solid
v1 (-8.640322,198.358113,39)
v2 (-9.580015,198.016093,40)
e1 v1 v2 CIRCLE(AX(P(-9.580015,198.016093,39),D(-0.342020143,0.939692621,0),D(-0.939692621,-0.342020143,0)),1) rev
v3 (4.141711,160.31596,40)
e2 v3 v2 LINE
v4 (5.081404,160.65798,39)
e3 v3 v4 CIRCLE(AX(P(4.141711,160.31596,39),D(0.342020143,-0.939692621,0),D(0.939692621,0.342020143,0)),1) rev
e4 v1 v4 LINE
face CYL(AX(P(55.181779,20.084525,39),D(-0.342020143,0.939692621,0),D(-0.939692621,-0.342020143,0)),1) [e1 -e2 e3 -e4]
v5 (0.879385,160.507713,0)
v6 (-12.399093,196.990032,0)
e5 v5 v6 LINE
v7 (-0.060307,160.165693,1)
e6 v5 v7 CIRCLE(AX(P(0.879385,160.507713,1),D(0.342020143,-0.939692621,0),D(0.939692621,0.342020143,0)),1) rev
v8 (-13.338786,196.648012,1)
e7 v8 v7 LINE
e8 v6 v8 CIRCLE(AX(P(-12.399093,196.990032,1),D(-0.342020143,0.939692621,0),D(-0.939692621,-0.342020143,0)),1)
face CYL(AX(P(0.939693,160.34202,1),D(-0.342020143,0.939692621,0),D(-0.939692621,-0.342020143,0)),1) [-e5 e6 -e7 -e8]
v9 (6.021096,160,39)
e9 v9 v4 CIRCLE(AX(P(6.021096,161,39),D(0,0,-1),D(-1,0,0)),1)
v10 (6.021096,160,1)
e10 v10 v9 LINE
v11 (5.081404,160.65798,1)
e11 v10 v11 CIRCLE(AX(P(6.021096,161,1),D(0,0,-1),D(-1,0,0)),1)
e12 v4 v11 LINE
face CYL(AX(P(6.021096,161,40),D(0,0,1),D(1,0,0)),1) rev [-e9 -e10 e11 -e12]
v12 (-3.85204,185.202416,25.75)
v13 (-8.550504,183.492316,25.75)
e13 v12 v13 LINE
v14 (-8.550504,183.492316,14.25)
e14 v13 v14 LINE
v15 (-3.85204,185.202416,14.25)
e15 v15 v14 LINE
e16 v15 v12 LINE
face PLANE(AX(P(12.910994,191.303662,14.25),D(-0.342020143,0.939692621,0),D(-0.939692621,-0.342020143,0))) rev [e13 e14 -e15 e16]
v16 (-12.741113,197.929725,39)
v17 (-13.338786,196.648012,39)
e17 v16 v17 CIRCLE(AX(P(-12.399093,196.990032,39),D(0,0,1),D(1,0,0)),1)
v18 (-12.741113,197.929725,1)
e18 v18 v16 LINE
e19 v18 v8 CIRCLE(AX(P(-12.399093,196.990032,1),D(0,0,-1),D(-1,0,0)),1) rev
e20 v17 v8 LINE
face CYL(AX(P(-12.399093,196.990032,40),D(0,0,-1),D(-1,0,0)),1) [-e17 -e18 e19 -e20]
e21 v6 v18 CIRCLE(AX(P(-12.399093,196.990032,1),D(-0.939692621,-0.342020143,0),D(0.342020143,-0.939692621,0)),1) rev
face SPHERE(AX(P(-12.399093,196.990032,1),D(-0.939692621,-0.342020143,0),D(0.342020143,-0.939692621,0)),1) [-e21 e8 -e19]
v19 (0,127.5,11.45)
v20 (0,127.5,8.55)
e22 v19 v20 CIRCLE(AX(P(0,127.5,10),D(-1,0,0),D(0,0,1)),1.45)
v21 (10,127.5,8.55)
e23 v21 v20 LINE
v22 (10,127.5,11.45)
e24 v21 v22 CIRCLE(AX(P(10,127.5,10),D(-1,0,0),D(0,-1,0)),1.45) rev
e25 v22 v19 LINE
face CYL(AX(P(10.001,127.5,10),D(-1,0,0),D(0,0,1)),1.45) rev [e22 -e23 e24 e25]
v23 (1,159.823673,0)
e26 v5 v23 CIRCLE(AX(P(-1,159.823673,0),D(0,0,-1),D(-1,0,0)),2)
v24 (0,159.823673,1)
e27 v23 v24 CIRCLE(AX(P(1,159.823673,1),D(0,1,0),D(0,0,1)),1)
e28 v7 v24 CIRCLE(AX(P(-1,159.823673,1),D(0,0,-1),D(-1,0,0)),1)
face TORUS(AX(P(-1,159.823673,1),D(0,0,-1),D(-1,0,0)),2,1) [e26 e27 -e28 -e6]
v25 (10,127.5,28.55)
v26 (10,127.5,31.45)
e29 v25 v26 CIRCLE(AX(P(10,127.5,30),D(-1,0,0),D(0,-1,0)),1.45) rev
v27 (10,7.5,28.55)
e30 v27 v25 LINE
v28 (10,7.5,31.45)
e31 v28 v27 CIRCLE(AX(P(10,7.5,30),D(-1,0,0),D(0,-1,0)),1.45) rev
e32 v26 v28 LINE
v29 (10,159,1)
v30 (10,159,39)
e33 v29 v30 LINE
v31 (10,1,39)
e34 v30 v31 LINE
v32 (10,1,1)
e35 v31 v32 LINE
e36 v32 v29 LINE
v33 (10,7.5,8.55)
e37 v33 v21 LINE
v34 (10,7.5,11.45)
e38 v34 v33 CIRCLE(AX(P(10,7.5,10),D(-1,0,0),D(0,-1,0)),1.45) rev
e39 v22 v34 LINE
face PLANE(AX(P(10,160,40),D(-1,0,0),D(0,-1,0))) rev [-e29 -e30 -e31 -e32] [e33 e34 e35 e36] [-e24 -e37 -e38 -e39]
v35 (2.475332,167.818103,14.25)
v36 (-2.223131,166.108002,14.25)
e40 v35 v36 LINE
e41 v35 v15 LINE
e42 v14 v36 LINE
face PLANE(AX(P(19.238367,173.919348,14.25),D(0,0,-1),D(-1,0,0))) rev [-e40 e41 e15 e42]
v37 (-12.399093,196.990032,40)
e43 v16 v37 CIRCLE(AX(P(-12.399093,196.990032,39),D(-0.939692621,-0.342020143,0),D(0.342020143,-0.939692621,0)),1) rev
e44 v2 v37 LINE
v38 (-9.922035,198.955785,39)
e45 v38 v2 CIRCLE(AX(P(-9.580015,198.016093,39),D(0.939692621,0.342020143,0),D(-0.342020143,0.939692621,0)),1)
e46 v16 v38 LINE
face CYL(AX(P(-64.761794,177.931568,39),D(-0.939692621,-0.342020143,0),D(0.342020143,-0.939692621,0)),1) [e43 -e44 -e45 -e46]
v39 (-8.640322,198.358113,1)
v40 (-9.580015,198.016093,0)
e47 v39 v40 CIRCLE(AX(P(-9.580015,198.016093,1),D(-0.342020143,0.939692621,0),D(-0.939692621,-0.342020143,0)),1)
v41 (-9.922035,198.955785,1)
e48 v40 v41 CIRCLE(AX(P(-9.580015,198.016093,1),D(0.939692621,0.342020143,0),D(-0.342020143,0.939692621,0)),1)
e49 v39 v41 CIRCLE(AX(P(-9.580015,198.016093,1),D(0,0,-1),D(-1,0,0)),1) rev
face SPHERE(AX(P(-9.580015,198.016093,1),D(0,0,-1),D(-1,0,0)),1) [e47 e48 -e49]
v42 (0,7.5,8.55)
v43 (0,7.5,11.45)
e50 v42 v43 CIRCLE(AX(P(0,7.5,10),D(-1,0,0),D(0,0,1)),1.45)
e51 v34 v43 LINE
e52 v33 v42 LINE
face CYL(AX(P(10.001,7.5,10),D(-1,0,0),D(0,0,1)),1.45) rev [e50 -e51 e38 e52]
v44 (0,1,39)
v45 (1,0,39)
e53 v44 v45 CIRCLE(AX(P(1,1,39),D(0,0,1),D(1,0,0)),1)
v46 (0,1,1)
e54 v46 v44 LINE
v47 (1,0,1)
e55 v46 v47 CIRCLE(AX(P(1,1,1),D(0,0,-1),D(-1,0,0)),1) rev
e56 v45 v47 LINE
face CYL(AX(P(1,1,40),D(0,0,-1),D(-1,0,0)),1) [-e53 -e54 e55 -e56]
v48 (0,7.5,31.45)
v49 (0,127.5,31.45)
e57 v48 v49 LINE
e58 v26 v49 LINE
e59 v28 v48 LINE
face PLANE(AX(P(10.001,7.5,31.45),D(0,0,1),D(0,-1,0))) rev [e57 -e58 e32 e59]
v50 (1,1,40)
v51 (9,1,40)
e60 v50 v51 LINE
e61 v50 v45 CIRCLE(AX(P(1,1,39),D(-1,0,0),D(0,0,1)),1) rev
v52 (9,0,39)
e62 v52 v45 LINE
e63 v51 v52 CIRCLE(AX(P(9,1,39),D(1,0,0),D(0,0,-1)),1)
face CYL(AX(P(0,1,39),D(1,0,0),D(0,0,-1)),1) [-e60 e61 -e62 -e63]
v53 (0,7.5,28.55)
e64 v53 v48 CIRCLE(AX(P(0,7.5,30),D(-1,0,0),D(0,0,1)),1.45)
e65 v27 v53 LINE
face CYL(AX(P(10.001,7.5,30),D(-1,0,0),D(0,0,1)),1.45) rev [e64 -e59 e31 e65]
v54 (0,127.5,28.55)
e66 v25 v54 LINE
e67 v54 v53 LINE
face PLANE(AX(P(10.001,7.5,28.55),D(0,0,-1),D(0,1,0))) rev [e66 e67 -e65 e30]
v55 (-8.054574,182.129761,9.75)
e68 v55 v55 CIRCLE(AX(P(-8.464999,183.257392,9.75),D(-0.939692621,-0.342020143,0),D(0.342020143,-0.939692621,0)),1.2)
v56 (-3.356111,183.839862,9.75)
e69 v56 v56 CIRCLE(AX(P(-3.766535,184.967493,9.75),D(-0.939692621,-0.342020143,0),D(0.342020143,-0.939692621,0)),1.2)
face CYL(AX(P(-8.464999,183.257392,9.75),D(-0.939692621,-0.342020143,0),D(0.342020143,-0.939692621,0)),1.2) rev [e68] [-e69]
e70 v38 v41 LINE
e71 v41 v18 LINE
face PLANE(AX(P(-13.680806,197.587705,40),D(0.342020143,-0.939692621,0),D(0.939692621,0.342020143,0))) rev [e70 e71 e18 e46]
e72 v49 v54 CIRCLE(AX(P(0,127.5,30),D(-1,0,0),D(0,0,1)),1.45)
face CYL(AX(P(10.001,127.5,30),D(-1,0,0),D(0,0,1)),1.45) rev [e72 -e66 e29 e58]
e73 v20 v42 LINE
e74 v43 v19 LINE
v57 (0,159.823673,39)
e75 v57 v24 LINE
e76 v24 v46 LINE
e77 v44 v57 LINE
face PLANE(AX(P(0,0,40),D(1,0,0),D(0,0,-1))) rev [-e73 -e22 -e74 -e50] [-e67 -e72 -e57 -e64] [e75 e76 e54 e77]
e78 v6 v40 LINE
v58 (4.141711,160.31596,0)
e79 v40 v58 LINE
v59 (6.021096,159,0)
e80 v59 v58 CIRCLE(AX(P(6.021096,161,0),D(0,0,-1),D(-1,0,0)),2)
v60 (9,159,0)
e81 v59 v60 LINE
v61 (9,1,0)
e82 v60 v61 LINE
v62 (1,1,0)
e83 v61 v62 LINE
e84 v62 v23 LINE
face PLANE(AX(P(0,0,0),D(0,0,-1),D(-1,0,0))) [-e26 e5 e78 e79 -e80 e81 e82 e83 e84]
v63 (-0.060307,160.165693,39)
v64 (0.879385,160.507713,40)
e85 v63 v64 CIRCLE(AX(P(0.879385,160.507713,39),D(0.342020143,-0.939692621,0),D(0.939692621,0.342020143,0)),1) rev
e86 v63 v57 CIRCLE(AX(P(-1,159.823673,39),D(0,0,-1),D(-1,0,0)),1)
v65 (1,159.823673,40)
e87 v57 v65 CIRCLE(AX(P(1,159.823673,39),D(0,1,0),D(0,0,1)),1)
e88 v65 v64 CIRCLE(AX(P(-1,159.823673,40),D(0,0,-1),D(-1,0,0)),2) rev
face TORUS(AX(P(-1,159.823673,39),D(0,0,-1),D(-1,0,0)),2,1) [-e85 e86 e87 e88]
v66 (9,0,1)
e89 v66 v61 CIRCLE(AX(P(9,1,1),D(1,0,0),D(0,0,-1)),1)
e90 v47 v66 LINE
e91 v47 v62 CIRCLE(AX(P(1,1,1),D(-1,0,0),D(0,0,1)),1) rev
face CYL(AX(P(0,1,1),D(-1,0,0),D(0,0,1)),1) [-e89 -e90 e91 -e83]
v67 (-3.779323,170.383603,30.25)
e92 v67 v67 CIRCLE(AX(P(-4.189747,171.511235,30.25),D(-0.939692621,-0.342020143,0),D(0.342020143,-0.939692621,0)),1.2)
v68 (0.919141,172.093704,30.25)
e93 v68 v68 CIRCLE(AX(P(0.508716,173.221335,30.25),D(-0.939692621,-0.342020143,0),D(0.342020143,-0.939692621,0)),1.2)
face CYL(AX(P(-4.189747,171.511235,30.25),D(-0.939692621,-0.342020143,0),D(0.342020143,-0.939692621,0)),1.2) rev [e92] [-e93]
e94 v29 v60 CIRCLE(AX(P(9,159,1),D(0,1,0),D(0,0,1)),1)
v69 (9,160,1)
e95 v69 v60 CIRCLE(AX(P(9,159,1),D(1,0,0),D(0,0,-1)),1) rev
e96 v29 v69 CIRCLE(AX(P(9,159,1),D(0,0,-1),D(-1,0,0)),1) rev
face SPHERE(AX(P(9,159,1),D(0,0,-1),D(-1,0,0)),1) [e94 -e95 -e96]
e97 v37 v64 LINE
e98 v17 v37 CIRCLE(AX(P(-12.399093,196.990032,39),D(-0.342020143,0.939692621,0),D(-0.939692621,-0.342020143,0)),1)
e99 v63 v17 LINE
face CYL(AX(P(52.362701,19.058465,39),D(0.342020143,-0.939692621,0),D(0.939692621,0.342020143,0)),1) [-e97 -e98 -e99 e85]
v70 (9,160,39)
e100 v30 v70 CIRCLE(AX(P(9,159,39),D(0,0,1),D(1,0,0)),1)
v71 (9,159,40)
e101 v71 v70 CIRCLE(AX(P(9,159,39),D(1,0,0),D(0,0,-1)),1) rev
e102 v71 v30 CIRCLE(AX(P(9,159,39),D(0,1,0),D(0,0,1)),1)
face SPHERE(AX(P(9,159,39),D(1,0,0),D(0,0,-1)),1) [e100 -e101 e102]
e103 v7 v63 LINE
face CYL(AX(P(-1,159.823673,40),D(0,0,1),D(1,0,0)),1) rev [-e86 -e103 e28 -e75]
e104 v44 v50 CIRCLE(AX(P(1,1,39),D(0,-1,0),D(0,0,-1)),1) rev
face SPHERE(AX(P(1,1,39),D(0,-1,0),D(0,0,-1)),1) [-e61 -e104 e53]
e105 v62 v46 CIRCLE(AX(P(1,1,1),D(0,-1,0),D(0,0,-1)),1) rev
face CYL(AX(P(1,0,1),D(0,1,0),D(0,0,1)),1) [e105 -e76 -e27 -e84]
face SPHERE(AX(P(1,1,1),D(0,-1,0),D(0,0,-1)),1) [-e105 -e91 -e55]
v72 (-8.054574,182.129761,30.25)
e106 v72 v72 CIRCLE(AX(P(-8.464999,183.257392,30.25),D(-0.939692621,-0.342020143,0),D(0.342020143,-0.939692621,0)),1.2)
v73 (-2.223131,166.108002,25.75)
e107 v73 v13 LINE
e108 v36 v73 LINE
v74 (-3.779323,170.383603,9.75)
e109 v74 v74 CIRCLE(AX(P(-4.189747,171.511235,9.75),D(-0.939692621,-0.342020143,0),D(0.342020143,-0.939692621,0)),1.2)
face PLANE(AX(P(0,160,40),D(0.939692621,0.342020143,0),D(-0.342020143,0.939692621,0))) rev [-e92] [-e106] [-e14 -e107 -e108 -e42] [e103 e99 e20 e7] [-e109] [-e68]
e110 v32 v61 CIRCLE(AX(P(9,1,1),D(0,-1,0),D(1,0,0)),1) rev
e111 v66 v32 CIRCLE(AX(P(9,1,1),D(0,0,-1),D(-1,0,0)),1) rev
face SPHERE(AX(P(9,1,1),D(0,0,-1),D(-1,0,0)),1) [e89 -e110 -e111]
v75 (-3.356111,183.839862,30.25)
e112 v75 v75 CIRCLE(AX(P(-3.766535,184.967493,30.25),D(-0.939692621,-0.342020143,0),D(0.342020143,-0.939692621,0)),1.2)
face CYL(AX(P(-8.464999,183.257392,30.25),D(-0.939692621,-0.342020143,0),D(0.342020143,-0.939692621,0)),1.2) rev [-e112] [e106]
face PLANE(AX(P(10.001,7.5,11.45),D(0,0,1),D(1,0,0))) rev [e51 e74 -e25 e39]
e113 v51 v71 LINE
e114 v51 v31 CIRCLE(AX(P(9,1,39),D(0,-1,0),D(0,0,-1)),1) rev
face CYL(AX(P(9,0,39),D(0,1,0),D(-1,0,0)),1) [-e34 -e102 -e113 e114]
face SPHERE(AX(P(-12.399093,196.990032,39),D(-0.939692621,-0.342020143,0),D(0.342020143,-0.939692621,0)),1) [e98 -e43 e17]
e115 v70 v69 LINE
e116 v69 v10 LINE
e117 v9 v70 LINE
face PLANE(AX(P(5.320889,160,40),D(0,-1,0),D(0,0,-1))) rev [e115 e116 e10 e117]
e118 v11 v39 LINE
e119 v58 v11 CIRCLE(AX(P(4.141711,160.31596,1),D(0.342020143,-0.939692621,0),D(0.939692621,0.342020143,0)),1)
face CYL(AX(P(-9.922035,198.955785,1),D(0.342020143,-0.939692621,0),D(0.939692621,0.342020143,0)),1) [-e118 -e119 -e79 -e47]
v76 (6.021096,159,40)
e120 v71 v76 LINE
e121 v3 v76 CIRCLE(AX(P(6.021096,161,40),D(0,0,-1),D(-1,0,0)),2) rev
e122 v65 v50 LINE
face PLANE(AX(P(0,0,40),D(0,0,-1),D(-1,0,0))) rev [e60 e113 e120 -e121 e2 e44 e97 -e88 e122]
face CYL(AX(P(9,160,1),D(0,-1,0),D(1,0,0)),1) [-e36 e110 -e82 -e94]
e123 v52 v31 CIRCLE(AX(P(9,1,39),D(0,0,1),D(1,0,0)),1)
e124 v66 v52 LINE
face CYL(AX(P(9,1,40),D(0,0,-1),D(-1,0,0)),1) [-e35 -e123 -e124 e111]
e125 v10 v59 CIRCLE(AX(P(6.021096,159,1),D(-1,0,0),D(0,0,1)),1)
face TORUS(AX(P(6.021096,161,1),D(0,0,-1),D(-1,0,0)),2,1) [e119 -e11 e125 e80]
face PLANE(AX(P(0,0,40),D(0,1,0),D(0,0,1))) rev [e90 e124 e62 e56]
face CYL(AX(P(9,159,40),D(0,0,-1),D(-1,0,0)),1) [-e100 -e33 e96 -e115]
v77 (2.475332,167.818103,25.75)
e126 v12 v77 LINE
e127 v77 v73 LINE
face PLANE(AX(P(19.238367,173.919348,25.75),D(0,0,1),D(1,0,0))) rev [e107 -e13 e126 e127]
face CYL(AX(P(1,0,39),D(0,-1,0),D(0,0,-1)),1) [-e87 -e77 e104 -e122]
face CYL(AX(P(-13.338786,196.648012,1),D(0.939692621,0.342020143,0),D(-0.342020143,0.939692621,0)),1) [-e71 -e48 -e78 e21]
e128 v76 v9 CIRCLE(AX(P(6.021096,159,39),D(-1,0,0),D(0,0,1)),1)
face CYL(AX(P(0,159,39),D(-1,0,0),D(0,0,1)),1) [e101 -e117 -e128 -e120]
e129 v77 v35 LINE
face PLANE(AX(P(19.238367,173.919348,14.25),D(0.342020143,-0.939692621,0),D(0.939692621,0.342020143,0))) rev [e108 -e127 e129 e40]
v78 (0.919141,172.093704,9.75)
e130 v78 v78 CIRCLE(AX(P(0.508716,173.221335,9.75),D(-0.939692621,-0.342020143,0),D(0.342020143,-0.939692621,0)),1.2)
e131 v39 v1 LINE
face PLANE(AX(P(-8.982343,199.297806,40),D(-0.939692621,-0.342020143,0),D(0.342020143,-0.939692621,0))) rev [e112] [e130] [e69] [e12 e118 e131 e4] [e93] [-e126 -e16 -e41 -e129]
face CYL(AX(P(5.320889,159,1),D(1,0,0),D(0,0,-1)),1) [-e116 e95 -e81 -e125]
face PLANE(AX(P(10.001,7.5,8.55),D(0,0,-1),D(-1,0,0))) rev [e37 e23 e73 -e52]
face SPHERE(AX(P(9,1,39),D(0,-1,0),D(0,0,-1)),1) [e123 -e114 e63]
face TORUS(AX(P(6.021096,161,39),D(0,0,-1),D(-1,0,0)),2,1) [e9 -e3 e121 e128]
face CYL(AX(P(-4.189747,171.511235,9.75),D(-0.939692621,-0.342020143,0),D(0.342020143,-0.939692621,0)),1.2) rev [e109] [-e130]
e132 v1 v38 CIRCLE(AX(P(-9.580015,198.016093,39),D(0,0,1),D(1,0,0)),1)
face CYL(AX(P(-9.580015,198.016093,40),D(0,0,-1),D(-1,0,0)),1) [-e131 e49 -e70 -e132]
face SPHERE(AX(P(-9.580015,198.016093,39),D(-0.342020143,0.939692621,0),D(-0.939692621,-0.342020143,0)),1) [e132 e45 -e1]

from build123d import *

# Parameters (mm, degrees)
BOSS_EXTRU_1_DEPTH       = 40
D_GAGEMENT_START         = 54.723222932
D_GAGEMENT_M22_OUTLINE_R = 1.2
D_GAGEMENT_M22_DEPTH     = 5
ENL_V_MAT_EXTRU_3_REACH  = 166.408
ESQUISSE12_W             = 11.5
ESQUISSE12_H             = 18.5
CONG_2_R                 = 1
ENL_V_MAT_EXTRU_4_REACH  = 205.438


# Read off the part's stored shape, not the designer's step: Dégagement M22
with BuildPart() as part:
    # Esquisse1 → Boss.-Extru.1 (new body)
    with BuildSketch(Plane.XY):
        Polygon((0, 0), (10, 0), (10, 160), (5.320888862, 160), (-8.982342629, 199.297805548), (-13.680805733, 197.587704831), (0, 160), align=None)
    extrude(amount=BOSS_EXTRU_1_DEPTH)

    # Dégagement M22 outline → Dégagement M22 (cut)
    with BuildSketch(Plane(origin=(0, 0, 0), x_dir=(-0.3420201433256691, 0.9396926207859082, 0), z_dir=(0.9396926207859083, 0.3420201433256691, 0)).offset(D_GAGEMENT_START)):
        with Locations((162.600819326, 30.25)):
            Circle(D_GAGEMENT_M22_OUTLINE_R)
        with Locations((175.100819326, 9.75)):
            Circle(D_GAGEMENT_M22_OUTLINE_R)
        with Locations((175.100819326, 30.25)):
            Circle(D_GAGEMENT_M22_OUTLINE_R)
        with Locations((162.600819326, 9.75)):
            Circle(D_GAGEMENT_M22_OUTLINE_R)
    extrude(amount=D_GAGEMENT_M22_DEPTH, mode=Mode.SUBTRACT)

    # Esquisse12 → Enlèv. mat.-Extru.3 (cut, up to next)
    with BuildSketch(Plane(origin=(39.231681983, 52.211839625, 50.949763499), x_dir=(0, 0, 1), z_dir=(-0.9396926207859084, -0.3420201433256691, 0)), mode=Mode.PRIVATE) as enl_v_mat_extru_3_sk1:
        with Locations((-30.949763499, 130.455764407)):
            Rectangle(ESQUISSE12_W, ESQUISSE12_H)
    enl_v_mat_extru_3_tool1 = extrude(enl_v_mat_extru_3_sk1.sketch, amount=-ENL_V_MAT_EXTRU_3_REACH, mode=Mode.PRIVATE) & part.part
    add(enl_v_mat_extru_3_tool1.solids().sort_by_distance((-5.386817, 174.800159, 20))[0], mode=Mode.SUBTRACT)

    # Congé2
    cong_2_edges = [part.edges().sort_by_distance(p)[0] for p in [
        (0, 80, 0),
        (0, 160, 20),
        (-13.680805733, 197.587704831, 20),
        (-8.982342629, 199.297805548, 20),
        (10, 80, 40),
        (5.320888862, 160, 20),
        (10, 160, 20),
        (10, 0, 20),
        (0, 0, 20),
        (7.660444431, 160, 40),
        (-1.830726883, 179.648902774, 40),
        (-11.331574181, 198.44275519, 40),
        (-6.840402867, 178.793852416, 40),
        (0, 80, 40),
        (-6.840402867, 178.793852416, 0),
        (-11.331574181, 198.44275519, 0),
        (-1.830726883, 179.648902774, 0),
        (7.660444431, 160, 0),
        (5, 0, 40),
        (10, 80, 0),
        (5, 0, 0),
    ]]
    fillet(cong_2_edges, radius=CONG_2_R)

    # Esquisse13 → Enlèv. mat.-Extru.4 (cut, up to next)
    with BuildSketch(Plane.ZY, mode=Mode.PRIVATE) as enl_v_mat_extru_4_sk1:
        with BuildLine():
            Line((8.55, 7.5), (8.55, 127.5))
            ThreePointArc((8.55, 127.5), (10, 128.95), (11.45, 127.5))
            Line((11.45, 127.5), (11.45, 7.5))
            ThreePointArc((11.45, 7.5), (10, 6.05), (8.55, 7.5))
        make_face()
    enl_v_mat_extru_4_tool1 = extrude(enl_v_mat_extru_4_sk1.sketch, amount=-ENL_V_MAT_EXTRU_4_REACH, mode=Mode.PRIVATE) & part.part
    # Esquisse13 → Enlèv. mat.-Extru.4 (cut, up to next)
    with BuildSketch(Plane.ZY, mode=Mode.PRIVATE) as enl_v_mat_extru_4_sk2:
        with BuildLine():
            Line((28.55, 7.5), (28.55, 127.5))
            ThreePointArc((28.55, 127.5), (30, 128.95), (31.45, 127.5))
            Line((31.45, 127.5), (31.45, 7.5))
            ThreePointArc((31.45, 7.5), (30, 6.05), (28.55, 7.5))
        make_face()
    enl_v_mat_extru_4_tool2 = extrude(enl_v_mat_extru_4_sk2.sketch, amount=-ENL_V_MAT_EXTRU_4_REACH, mode=Mode.PRIVATE) & part.part
    add(enl_v_mat_extru_4_tool1.solids().sort_by_distance((0, 67.5, 10))[0], mode=Mode.SUBTRACT)
    add(enl_v_mat_extru_4_tool2.solids().sort_by_distance((0, 67.5, 30))[0], mode=Mode.SUBTRACT)


solid = part.part
